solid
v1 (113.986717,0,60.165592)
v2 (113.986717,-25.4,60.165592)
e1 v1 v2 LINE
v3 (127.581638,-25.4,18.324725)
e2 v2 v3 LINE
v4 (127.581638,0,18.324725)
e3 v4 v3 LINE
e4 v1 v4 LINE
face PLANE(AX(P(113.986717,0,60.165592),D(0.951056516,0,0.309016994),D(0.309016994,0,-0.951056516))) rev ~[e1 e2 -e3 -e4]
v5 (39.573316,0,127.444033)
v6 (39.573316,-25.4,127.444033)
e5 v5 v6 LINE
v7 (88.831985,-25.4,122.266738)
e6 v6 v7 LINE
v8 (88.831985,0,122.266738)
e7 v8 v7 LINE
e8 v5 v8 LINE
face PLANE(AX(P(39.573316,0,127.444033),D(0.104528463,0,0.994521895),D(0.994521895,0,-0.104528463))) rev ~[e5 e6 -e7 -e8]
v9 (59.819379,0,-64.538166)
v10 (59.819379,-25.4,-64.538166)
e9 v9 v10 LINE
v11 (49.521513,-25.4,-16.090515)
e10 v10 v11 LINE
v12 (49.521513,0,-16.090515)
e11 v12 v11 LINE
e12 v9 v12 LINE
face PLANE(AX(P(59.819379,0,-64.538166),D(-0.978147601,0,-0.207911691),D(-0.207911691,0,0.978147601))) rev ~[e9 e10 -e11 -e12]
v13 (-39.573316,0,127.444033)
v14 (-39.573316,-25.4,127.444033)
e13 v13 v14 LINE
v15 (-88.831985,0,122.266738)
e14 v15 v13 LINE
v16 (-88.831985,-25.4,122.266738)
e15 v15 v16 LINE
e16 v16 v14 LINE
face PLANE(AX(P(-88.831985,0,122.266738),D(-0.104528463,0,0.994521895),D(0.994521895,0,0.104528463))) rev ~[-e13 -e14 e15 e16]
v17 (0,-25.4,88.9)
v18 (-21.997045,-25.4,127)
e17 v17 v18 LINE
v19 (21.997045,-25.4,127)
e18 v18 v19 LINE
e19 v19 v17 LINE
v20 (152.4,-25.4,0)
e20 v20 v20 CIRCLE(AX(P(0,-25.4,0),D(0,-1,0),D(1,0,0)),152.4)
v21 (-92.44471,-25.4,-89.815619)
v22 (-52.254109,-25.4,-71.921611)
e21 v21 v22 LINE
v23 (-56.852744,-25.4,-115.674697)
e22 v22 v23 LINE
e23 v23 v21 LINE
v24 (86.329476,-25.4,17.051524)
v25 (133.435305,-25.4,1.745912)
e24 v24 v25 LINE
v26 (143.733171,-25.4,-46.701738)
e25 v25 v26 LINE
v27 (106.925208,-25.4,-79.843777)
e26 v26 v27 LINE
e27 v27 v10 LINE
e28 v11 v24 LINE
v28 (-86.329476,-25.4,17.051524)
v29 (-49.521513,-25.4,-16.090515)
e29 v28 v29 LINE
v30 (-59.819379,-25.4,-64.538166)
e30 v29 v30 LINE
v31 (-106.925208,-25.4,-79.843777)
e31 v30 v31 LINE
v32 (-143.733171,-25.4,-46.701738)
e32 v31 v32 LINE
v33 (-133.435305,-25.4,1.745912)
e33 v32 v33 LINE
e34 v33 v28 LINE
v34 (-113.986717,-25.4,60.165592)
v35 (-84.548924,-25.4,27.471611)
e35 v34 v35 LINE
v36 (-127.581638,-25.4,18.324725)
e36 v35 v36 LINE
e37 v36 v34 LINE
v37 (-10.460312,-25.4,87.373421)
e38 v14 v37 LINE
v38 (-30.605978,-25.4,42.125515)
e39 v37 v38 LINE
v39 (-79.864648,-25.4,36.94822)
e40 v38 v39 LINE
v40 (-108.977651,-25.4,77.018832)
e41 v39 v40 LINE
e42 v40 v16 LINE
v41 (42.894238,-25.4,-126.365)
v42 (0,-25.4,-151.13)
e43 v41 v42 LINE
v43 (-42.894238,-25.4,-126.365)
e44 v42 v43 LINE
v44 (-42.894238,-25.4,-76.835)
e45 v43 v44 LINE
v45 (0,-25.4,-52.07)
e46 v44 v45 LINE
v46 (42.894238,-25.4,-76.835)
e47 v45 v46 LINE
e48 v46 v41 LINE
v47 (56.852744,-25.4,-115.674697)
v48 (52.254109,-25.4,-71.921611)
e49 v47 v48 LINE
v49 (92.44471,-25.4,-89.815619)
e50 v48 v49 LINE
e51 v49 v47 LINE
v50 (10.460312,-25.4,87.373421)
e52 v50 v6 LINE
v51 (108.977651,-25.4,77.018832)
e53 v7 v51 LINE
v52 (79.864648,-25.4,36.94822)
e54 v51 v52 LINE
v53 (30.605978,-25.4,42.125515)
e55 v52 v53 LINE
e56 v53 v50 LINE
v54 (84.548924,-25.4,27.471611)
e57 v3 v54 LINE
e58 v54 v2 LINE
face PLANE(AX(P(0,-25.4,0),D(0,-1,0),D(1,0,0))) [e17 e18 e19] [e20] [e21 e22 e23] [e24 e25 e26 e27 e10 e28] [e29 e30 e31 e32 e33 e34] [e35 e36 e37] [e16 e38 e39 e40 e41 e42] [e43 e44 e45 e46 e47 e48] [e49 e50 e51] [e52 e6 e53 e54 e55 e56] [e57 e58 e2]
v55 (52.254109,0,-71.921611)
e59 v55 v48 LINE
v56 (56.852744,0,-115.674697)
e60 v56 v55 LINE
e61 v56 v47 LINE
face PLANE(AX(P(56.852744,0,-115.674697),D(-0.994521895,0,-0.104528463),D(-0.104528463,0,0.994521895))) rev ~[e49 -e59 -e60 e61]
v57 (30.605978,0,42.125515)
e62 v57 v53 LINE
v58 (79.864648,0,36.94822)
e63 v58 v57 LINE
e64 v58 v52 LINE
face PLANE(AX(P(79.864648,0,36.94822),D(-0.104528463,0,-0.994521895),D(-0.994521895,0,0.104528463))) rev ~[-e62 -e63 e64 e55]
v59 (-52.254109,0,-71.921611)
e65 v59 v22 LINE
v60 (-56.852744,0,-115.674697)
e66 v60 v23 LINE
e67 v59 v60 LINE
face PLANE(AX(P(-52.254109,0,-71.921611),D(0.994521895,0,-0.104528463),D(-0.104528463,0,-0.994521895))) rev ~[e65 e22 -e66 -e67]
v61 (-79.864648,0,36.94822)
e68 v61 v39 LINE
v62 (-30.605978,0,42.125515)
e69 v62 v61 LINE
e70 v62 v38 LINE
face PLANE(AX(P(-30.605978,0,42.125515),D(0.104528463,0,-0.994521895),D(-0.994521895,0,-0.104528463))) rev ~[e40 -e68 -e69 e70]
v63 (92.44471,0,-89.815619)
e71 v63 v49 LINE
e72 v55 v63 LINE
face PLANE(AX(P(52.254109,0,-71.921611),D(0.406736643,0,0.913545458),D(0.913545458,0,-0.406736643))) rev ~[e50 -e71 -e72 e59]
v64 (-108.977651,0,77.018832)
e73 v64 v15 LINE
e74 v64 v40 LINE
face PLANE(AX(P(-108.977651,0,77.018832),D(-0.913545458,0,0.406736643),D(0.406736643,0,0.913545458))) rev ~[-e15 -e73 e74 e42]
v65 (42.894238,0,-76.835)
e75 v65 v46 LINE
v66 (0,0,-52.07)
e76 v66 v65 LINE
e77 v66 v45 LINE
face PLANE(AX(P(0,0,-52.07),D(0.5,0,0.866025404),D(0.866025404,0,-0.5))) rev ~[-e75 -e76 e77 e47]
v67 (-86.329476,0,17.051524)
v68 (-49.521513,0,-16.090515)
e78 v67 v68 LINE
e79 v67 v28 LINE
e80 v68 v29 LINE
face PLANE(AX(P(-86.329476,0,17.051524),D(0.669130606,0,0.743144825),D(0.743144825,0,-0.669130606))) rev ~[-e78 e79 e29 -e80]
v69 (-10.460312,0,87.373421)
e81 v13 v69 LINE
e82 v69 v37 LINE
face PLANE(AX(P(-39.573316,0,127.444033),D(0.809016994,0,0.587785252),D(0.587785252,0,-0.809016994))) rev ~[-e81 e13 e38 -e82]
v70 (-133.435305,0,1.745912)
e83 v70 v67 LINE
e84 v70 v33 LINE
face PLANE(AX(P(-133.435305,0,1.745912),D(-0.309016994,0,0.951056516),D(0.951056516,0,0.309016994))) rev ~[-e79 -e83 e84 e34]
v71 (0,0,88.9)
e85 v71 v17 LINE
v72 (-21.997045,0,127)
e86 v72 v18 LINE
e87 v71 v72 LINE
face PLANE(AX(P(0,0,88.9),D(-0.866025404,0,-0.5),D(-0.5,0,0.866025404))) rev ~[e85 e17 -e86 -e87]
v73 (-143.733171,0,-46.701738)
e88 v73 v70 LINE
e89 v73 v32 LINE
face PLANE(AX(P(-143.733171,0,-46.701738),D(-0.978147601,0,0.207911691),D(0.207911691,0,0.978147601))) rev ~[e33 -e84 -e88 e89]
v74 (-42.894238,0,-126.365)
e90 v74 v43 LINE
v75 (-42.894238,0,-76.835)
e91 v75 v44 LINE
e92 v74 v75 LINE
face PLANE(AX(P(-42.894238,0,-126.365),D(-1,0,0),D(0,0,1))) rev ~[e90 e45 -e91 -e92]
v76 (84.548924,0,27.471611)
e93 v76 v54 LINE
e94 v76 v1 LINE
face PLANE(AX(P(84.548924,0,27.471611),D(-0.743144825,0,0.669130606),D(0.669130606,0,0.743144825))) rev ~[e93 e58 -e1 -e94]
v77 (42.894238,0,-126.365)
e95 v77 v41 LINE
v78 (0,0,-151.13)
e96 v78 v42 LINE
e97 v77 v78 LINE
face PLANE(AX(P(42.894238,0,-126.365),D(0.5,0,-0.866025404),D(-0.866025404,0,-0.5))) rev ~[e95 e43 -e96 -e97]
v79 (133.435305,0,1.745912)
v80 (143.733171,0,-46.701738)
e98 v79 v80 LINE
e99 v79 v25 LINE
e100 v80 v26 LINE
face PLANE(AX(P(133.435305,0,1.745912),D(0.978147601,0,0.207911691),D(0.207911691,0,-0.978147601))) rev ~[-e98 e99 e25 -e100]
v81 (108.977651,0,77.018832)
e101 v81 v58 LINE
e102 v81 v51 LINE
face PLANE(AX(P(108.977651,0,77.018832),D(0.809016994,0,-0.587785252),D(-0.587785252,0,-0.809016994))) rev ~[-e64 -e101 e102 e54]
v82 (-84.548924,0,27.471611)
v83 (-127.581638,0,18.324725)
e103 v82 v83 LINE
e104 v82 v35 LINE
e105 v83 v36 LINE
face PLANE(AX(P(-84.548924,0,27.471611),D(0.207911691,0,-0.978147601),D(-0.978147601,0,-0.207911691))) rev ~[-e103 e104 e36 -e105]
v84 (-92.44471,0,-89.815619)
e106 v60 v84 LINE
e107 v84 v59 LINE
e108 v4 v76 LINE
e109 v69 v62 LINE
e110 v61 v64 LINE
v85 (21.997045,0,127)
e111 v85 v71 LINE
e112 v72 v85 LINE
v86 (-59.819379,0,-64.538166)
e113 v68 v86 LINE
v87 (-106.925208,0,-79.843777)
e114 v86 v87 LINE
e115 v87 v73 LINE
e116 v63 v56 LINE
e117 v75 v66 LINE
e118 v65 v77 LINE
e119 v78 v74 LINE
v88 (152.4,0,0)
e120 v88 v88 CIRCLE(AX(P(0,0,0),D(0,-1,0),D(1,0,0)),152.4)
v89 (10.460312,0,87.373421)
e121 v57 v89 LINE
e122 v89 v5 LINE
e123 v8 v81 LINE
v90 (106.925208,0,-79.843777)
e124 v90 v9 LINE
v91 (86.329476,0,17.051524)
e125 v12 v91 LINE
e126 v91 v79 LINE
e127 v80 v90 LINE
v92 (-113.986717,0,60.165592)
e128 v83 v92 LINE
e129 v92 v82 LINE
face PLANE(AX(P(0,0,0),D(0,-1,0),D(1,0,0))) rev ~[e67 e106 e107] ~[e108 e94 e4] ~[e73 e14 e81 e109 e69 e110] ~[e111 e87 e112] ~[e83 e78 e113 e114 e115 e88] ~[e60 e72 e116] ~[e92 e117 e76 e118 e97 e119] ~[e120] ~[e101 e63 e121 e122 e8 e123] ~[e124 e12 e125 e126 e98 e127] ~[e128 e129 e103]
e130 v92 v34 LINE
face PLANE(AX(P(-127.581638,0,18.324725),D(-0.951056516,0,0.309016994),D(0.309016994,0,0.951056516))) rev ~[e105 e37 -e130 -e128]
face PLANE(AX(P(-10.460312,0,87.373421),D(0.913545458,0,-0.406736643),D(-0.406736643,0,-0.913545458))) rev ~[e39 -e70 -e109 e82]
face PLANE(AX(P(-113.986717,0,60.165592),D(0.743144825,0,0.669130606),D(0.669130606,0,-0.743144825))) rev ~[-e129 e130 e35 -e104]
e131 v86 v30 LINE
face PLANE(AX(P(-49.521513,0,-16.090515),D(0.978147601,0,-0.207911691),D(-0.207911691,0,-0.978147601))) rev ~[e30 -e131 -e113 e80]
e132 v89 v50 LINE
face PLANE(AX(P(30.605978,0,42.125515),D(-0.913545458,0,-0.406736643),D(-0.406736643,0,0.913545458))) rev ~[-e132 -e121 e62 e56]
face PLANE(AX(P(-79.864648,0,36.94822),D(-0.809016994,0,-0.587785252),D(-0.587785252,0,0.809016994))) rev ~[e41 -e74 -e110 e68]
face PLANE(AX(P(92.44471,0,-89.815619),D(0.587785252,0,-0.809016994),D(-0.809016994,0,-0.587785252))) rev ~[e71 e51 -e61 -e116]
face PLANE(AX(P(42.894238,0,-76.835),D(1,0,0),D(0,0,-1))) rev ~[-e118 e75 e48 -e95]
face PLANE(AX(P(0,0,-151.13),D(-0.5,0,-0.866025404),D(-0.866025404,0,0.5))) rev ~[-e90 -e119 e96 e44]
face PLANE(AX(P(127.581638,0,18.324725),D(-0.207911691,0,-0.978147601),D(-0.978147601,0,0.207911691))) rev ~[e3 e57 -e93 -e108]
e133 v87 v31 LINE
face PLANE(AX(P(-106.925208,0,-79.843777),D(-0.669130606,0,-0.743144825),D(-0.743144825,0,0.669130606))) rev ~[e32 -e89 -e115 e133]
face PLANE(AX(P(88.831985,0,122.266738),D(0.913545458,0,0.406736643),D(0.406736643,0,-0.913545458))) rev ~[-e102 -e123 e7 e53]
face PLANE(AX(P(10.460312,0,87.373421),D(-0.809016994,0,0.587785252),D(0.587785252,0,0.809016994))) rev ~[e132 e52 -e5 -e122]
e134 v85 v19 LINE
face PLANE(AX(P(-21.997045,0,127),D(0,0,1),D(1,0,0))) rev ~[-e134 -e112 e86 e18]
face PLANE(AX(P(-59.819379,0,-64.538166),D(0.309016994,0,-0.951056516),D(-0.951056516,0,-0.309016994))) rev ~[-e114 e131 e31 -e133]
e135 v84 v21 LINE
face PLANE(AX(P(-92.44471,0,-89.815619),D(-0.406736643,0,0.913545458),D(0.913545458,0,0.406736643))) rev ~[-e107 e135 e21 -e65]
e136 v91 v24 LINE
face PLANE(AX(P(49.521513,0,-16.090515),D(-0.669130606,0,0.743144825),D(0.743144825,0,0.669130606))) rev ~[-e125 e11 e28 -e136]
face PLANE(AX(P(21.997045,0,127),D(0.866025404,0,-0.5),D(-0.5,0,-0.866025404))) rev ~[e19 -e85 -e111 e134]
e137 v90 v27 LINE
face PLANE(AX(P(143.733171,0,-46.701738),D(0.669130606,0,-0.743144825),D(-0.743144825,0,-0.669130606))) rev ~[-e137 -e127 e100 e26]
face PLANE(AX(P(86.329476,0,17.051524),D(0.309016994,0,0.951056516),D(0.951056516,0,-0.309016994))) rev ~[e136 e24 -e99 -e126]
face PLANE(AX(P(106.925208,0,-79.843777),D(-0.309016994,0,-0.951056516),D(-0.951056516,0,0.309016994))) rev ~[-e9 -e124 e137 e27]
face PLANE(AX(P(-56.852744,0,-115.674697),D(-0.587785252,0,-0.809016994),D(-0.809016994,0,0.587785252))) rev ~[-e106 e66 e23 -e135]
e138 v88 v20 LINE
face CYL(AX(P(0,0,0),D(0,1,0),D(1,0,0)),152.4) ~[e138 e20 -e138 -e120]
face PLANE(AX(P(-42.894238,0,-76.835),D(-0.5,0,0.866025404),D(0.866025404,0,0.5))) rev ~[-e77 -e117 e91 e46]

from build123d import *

# Parameters (mm, degrees)
F0_R     = 152.4
F2_DEPTH = 25.4


# Not quite as in the source:
# - a feature of the source that left no trace in its solid (it failed there, or was rolled back) is left out


with BuildPart() as f2:
    # F0 (on Front) → F2 (new body)
    with BuildSketch(Plane.XZ):
        Circle(F0_R)
        Polygon((-52.2541089288, -71.9216107999), (-56.8527436029, -115.6746970812), (-92.4447104794, -89.8156194901), align=None, mode=Mode.SUBTRACT)
        Polygon((-59.8193788497, -64.5381655614), (-106.9252081018, -79.8437772928), (-143.7331713077, -46.7017383599), (-133.4353052615, 1.7459123045), (-86.3294760094, 17.0515240359), (-49.5215128035, -16.0905148971), align=None, mode=Mode.SUBTRACT)
        Polygon((42.8942382494, -76.835), (42.8942382494, -126.365), (0, -151.13), (-42.8942382494, -126.365), (-42.8942382494, -76.835), (0, -52.07), align=None, mode=Mode.SUBTRACT)
        Polygon((52.2541089288, -71.9216107999), (92.4447104794, -89.8156194901), (56.8527436029, -115.6746970812), align=None, mode=Mode.SUBTRACT)
        Polygon((86.3294760094, 17.0515240359), (133.4353052615, 1.7459123045), (143.7331713077, -46.7017383599), (106.9252081018, -79.8437772928), (59.8193788497, -64.5381655614), (49.5215128035, -16.0905148971), align=None, mode=Mode.SUBTRACT)
        Polygon((-84.5489242986, 27.4716107999), (-127.5816383797, 18.3247250555), (-113.9867167593, 60.1655915157), align=None, mode=Mode.SUBTRACT)
        Polygon((-79.8646475645, 36.9482201115), (-108.9776511105, 77.0188318428), (-88.831985179, 122.2667383599), (-39.5733157014, 127.4440331455), (-10.4603121553, 87.3734214141), (-30.6059780869, 42.1255148971), align=None, mode=Mode.SUBTRACT)
        Polygon((84.5489242986, 27.4716107999), (113.9867167593, 60.1655915157), (127.5816383797, 18.3247250555), align=None, mode=Mode.SUBTRACT)
        Polygon((21.9970452561, 127), (0, 88.9), (-21.9970452561, 127), align=None, mode=Mode.SUBTRACT)
        Polygon((10.4603121553, 87.3734214141), (39.5733157014, 127.4440331455), (88.831985179, 122.2667383599), (108.9776511105, 77.0188318428), (79.8646475645, 36.9482201115), (30.6059780869, 42.1255148971), align=None, mode=Mode.SUBTRACT)
    extrude(amount=F2_DEPTH)


solid = f2.part
